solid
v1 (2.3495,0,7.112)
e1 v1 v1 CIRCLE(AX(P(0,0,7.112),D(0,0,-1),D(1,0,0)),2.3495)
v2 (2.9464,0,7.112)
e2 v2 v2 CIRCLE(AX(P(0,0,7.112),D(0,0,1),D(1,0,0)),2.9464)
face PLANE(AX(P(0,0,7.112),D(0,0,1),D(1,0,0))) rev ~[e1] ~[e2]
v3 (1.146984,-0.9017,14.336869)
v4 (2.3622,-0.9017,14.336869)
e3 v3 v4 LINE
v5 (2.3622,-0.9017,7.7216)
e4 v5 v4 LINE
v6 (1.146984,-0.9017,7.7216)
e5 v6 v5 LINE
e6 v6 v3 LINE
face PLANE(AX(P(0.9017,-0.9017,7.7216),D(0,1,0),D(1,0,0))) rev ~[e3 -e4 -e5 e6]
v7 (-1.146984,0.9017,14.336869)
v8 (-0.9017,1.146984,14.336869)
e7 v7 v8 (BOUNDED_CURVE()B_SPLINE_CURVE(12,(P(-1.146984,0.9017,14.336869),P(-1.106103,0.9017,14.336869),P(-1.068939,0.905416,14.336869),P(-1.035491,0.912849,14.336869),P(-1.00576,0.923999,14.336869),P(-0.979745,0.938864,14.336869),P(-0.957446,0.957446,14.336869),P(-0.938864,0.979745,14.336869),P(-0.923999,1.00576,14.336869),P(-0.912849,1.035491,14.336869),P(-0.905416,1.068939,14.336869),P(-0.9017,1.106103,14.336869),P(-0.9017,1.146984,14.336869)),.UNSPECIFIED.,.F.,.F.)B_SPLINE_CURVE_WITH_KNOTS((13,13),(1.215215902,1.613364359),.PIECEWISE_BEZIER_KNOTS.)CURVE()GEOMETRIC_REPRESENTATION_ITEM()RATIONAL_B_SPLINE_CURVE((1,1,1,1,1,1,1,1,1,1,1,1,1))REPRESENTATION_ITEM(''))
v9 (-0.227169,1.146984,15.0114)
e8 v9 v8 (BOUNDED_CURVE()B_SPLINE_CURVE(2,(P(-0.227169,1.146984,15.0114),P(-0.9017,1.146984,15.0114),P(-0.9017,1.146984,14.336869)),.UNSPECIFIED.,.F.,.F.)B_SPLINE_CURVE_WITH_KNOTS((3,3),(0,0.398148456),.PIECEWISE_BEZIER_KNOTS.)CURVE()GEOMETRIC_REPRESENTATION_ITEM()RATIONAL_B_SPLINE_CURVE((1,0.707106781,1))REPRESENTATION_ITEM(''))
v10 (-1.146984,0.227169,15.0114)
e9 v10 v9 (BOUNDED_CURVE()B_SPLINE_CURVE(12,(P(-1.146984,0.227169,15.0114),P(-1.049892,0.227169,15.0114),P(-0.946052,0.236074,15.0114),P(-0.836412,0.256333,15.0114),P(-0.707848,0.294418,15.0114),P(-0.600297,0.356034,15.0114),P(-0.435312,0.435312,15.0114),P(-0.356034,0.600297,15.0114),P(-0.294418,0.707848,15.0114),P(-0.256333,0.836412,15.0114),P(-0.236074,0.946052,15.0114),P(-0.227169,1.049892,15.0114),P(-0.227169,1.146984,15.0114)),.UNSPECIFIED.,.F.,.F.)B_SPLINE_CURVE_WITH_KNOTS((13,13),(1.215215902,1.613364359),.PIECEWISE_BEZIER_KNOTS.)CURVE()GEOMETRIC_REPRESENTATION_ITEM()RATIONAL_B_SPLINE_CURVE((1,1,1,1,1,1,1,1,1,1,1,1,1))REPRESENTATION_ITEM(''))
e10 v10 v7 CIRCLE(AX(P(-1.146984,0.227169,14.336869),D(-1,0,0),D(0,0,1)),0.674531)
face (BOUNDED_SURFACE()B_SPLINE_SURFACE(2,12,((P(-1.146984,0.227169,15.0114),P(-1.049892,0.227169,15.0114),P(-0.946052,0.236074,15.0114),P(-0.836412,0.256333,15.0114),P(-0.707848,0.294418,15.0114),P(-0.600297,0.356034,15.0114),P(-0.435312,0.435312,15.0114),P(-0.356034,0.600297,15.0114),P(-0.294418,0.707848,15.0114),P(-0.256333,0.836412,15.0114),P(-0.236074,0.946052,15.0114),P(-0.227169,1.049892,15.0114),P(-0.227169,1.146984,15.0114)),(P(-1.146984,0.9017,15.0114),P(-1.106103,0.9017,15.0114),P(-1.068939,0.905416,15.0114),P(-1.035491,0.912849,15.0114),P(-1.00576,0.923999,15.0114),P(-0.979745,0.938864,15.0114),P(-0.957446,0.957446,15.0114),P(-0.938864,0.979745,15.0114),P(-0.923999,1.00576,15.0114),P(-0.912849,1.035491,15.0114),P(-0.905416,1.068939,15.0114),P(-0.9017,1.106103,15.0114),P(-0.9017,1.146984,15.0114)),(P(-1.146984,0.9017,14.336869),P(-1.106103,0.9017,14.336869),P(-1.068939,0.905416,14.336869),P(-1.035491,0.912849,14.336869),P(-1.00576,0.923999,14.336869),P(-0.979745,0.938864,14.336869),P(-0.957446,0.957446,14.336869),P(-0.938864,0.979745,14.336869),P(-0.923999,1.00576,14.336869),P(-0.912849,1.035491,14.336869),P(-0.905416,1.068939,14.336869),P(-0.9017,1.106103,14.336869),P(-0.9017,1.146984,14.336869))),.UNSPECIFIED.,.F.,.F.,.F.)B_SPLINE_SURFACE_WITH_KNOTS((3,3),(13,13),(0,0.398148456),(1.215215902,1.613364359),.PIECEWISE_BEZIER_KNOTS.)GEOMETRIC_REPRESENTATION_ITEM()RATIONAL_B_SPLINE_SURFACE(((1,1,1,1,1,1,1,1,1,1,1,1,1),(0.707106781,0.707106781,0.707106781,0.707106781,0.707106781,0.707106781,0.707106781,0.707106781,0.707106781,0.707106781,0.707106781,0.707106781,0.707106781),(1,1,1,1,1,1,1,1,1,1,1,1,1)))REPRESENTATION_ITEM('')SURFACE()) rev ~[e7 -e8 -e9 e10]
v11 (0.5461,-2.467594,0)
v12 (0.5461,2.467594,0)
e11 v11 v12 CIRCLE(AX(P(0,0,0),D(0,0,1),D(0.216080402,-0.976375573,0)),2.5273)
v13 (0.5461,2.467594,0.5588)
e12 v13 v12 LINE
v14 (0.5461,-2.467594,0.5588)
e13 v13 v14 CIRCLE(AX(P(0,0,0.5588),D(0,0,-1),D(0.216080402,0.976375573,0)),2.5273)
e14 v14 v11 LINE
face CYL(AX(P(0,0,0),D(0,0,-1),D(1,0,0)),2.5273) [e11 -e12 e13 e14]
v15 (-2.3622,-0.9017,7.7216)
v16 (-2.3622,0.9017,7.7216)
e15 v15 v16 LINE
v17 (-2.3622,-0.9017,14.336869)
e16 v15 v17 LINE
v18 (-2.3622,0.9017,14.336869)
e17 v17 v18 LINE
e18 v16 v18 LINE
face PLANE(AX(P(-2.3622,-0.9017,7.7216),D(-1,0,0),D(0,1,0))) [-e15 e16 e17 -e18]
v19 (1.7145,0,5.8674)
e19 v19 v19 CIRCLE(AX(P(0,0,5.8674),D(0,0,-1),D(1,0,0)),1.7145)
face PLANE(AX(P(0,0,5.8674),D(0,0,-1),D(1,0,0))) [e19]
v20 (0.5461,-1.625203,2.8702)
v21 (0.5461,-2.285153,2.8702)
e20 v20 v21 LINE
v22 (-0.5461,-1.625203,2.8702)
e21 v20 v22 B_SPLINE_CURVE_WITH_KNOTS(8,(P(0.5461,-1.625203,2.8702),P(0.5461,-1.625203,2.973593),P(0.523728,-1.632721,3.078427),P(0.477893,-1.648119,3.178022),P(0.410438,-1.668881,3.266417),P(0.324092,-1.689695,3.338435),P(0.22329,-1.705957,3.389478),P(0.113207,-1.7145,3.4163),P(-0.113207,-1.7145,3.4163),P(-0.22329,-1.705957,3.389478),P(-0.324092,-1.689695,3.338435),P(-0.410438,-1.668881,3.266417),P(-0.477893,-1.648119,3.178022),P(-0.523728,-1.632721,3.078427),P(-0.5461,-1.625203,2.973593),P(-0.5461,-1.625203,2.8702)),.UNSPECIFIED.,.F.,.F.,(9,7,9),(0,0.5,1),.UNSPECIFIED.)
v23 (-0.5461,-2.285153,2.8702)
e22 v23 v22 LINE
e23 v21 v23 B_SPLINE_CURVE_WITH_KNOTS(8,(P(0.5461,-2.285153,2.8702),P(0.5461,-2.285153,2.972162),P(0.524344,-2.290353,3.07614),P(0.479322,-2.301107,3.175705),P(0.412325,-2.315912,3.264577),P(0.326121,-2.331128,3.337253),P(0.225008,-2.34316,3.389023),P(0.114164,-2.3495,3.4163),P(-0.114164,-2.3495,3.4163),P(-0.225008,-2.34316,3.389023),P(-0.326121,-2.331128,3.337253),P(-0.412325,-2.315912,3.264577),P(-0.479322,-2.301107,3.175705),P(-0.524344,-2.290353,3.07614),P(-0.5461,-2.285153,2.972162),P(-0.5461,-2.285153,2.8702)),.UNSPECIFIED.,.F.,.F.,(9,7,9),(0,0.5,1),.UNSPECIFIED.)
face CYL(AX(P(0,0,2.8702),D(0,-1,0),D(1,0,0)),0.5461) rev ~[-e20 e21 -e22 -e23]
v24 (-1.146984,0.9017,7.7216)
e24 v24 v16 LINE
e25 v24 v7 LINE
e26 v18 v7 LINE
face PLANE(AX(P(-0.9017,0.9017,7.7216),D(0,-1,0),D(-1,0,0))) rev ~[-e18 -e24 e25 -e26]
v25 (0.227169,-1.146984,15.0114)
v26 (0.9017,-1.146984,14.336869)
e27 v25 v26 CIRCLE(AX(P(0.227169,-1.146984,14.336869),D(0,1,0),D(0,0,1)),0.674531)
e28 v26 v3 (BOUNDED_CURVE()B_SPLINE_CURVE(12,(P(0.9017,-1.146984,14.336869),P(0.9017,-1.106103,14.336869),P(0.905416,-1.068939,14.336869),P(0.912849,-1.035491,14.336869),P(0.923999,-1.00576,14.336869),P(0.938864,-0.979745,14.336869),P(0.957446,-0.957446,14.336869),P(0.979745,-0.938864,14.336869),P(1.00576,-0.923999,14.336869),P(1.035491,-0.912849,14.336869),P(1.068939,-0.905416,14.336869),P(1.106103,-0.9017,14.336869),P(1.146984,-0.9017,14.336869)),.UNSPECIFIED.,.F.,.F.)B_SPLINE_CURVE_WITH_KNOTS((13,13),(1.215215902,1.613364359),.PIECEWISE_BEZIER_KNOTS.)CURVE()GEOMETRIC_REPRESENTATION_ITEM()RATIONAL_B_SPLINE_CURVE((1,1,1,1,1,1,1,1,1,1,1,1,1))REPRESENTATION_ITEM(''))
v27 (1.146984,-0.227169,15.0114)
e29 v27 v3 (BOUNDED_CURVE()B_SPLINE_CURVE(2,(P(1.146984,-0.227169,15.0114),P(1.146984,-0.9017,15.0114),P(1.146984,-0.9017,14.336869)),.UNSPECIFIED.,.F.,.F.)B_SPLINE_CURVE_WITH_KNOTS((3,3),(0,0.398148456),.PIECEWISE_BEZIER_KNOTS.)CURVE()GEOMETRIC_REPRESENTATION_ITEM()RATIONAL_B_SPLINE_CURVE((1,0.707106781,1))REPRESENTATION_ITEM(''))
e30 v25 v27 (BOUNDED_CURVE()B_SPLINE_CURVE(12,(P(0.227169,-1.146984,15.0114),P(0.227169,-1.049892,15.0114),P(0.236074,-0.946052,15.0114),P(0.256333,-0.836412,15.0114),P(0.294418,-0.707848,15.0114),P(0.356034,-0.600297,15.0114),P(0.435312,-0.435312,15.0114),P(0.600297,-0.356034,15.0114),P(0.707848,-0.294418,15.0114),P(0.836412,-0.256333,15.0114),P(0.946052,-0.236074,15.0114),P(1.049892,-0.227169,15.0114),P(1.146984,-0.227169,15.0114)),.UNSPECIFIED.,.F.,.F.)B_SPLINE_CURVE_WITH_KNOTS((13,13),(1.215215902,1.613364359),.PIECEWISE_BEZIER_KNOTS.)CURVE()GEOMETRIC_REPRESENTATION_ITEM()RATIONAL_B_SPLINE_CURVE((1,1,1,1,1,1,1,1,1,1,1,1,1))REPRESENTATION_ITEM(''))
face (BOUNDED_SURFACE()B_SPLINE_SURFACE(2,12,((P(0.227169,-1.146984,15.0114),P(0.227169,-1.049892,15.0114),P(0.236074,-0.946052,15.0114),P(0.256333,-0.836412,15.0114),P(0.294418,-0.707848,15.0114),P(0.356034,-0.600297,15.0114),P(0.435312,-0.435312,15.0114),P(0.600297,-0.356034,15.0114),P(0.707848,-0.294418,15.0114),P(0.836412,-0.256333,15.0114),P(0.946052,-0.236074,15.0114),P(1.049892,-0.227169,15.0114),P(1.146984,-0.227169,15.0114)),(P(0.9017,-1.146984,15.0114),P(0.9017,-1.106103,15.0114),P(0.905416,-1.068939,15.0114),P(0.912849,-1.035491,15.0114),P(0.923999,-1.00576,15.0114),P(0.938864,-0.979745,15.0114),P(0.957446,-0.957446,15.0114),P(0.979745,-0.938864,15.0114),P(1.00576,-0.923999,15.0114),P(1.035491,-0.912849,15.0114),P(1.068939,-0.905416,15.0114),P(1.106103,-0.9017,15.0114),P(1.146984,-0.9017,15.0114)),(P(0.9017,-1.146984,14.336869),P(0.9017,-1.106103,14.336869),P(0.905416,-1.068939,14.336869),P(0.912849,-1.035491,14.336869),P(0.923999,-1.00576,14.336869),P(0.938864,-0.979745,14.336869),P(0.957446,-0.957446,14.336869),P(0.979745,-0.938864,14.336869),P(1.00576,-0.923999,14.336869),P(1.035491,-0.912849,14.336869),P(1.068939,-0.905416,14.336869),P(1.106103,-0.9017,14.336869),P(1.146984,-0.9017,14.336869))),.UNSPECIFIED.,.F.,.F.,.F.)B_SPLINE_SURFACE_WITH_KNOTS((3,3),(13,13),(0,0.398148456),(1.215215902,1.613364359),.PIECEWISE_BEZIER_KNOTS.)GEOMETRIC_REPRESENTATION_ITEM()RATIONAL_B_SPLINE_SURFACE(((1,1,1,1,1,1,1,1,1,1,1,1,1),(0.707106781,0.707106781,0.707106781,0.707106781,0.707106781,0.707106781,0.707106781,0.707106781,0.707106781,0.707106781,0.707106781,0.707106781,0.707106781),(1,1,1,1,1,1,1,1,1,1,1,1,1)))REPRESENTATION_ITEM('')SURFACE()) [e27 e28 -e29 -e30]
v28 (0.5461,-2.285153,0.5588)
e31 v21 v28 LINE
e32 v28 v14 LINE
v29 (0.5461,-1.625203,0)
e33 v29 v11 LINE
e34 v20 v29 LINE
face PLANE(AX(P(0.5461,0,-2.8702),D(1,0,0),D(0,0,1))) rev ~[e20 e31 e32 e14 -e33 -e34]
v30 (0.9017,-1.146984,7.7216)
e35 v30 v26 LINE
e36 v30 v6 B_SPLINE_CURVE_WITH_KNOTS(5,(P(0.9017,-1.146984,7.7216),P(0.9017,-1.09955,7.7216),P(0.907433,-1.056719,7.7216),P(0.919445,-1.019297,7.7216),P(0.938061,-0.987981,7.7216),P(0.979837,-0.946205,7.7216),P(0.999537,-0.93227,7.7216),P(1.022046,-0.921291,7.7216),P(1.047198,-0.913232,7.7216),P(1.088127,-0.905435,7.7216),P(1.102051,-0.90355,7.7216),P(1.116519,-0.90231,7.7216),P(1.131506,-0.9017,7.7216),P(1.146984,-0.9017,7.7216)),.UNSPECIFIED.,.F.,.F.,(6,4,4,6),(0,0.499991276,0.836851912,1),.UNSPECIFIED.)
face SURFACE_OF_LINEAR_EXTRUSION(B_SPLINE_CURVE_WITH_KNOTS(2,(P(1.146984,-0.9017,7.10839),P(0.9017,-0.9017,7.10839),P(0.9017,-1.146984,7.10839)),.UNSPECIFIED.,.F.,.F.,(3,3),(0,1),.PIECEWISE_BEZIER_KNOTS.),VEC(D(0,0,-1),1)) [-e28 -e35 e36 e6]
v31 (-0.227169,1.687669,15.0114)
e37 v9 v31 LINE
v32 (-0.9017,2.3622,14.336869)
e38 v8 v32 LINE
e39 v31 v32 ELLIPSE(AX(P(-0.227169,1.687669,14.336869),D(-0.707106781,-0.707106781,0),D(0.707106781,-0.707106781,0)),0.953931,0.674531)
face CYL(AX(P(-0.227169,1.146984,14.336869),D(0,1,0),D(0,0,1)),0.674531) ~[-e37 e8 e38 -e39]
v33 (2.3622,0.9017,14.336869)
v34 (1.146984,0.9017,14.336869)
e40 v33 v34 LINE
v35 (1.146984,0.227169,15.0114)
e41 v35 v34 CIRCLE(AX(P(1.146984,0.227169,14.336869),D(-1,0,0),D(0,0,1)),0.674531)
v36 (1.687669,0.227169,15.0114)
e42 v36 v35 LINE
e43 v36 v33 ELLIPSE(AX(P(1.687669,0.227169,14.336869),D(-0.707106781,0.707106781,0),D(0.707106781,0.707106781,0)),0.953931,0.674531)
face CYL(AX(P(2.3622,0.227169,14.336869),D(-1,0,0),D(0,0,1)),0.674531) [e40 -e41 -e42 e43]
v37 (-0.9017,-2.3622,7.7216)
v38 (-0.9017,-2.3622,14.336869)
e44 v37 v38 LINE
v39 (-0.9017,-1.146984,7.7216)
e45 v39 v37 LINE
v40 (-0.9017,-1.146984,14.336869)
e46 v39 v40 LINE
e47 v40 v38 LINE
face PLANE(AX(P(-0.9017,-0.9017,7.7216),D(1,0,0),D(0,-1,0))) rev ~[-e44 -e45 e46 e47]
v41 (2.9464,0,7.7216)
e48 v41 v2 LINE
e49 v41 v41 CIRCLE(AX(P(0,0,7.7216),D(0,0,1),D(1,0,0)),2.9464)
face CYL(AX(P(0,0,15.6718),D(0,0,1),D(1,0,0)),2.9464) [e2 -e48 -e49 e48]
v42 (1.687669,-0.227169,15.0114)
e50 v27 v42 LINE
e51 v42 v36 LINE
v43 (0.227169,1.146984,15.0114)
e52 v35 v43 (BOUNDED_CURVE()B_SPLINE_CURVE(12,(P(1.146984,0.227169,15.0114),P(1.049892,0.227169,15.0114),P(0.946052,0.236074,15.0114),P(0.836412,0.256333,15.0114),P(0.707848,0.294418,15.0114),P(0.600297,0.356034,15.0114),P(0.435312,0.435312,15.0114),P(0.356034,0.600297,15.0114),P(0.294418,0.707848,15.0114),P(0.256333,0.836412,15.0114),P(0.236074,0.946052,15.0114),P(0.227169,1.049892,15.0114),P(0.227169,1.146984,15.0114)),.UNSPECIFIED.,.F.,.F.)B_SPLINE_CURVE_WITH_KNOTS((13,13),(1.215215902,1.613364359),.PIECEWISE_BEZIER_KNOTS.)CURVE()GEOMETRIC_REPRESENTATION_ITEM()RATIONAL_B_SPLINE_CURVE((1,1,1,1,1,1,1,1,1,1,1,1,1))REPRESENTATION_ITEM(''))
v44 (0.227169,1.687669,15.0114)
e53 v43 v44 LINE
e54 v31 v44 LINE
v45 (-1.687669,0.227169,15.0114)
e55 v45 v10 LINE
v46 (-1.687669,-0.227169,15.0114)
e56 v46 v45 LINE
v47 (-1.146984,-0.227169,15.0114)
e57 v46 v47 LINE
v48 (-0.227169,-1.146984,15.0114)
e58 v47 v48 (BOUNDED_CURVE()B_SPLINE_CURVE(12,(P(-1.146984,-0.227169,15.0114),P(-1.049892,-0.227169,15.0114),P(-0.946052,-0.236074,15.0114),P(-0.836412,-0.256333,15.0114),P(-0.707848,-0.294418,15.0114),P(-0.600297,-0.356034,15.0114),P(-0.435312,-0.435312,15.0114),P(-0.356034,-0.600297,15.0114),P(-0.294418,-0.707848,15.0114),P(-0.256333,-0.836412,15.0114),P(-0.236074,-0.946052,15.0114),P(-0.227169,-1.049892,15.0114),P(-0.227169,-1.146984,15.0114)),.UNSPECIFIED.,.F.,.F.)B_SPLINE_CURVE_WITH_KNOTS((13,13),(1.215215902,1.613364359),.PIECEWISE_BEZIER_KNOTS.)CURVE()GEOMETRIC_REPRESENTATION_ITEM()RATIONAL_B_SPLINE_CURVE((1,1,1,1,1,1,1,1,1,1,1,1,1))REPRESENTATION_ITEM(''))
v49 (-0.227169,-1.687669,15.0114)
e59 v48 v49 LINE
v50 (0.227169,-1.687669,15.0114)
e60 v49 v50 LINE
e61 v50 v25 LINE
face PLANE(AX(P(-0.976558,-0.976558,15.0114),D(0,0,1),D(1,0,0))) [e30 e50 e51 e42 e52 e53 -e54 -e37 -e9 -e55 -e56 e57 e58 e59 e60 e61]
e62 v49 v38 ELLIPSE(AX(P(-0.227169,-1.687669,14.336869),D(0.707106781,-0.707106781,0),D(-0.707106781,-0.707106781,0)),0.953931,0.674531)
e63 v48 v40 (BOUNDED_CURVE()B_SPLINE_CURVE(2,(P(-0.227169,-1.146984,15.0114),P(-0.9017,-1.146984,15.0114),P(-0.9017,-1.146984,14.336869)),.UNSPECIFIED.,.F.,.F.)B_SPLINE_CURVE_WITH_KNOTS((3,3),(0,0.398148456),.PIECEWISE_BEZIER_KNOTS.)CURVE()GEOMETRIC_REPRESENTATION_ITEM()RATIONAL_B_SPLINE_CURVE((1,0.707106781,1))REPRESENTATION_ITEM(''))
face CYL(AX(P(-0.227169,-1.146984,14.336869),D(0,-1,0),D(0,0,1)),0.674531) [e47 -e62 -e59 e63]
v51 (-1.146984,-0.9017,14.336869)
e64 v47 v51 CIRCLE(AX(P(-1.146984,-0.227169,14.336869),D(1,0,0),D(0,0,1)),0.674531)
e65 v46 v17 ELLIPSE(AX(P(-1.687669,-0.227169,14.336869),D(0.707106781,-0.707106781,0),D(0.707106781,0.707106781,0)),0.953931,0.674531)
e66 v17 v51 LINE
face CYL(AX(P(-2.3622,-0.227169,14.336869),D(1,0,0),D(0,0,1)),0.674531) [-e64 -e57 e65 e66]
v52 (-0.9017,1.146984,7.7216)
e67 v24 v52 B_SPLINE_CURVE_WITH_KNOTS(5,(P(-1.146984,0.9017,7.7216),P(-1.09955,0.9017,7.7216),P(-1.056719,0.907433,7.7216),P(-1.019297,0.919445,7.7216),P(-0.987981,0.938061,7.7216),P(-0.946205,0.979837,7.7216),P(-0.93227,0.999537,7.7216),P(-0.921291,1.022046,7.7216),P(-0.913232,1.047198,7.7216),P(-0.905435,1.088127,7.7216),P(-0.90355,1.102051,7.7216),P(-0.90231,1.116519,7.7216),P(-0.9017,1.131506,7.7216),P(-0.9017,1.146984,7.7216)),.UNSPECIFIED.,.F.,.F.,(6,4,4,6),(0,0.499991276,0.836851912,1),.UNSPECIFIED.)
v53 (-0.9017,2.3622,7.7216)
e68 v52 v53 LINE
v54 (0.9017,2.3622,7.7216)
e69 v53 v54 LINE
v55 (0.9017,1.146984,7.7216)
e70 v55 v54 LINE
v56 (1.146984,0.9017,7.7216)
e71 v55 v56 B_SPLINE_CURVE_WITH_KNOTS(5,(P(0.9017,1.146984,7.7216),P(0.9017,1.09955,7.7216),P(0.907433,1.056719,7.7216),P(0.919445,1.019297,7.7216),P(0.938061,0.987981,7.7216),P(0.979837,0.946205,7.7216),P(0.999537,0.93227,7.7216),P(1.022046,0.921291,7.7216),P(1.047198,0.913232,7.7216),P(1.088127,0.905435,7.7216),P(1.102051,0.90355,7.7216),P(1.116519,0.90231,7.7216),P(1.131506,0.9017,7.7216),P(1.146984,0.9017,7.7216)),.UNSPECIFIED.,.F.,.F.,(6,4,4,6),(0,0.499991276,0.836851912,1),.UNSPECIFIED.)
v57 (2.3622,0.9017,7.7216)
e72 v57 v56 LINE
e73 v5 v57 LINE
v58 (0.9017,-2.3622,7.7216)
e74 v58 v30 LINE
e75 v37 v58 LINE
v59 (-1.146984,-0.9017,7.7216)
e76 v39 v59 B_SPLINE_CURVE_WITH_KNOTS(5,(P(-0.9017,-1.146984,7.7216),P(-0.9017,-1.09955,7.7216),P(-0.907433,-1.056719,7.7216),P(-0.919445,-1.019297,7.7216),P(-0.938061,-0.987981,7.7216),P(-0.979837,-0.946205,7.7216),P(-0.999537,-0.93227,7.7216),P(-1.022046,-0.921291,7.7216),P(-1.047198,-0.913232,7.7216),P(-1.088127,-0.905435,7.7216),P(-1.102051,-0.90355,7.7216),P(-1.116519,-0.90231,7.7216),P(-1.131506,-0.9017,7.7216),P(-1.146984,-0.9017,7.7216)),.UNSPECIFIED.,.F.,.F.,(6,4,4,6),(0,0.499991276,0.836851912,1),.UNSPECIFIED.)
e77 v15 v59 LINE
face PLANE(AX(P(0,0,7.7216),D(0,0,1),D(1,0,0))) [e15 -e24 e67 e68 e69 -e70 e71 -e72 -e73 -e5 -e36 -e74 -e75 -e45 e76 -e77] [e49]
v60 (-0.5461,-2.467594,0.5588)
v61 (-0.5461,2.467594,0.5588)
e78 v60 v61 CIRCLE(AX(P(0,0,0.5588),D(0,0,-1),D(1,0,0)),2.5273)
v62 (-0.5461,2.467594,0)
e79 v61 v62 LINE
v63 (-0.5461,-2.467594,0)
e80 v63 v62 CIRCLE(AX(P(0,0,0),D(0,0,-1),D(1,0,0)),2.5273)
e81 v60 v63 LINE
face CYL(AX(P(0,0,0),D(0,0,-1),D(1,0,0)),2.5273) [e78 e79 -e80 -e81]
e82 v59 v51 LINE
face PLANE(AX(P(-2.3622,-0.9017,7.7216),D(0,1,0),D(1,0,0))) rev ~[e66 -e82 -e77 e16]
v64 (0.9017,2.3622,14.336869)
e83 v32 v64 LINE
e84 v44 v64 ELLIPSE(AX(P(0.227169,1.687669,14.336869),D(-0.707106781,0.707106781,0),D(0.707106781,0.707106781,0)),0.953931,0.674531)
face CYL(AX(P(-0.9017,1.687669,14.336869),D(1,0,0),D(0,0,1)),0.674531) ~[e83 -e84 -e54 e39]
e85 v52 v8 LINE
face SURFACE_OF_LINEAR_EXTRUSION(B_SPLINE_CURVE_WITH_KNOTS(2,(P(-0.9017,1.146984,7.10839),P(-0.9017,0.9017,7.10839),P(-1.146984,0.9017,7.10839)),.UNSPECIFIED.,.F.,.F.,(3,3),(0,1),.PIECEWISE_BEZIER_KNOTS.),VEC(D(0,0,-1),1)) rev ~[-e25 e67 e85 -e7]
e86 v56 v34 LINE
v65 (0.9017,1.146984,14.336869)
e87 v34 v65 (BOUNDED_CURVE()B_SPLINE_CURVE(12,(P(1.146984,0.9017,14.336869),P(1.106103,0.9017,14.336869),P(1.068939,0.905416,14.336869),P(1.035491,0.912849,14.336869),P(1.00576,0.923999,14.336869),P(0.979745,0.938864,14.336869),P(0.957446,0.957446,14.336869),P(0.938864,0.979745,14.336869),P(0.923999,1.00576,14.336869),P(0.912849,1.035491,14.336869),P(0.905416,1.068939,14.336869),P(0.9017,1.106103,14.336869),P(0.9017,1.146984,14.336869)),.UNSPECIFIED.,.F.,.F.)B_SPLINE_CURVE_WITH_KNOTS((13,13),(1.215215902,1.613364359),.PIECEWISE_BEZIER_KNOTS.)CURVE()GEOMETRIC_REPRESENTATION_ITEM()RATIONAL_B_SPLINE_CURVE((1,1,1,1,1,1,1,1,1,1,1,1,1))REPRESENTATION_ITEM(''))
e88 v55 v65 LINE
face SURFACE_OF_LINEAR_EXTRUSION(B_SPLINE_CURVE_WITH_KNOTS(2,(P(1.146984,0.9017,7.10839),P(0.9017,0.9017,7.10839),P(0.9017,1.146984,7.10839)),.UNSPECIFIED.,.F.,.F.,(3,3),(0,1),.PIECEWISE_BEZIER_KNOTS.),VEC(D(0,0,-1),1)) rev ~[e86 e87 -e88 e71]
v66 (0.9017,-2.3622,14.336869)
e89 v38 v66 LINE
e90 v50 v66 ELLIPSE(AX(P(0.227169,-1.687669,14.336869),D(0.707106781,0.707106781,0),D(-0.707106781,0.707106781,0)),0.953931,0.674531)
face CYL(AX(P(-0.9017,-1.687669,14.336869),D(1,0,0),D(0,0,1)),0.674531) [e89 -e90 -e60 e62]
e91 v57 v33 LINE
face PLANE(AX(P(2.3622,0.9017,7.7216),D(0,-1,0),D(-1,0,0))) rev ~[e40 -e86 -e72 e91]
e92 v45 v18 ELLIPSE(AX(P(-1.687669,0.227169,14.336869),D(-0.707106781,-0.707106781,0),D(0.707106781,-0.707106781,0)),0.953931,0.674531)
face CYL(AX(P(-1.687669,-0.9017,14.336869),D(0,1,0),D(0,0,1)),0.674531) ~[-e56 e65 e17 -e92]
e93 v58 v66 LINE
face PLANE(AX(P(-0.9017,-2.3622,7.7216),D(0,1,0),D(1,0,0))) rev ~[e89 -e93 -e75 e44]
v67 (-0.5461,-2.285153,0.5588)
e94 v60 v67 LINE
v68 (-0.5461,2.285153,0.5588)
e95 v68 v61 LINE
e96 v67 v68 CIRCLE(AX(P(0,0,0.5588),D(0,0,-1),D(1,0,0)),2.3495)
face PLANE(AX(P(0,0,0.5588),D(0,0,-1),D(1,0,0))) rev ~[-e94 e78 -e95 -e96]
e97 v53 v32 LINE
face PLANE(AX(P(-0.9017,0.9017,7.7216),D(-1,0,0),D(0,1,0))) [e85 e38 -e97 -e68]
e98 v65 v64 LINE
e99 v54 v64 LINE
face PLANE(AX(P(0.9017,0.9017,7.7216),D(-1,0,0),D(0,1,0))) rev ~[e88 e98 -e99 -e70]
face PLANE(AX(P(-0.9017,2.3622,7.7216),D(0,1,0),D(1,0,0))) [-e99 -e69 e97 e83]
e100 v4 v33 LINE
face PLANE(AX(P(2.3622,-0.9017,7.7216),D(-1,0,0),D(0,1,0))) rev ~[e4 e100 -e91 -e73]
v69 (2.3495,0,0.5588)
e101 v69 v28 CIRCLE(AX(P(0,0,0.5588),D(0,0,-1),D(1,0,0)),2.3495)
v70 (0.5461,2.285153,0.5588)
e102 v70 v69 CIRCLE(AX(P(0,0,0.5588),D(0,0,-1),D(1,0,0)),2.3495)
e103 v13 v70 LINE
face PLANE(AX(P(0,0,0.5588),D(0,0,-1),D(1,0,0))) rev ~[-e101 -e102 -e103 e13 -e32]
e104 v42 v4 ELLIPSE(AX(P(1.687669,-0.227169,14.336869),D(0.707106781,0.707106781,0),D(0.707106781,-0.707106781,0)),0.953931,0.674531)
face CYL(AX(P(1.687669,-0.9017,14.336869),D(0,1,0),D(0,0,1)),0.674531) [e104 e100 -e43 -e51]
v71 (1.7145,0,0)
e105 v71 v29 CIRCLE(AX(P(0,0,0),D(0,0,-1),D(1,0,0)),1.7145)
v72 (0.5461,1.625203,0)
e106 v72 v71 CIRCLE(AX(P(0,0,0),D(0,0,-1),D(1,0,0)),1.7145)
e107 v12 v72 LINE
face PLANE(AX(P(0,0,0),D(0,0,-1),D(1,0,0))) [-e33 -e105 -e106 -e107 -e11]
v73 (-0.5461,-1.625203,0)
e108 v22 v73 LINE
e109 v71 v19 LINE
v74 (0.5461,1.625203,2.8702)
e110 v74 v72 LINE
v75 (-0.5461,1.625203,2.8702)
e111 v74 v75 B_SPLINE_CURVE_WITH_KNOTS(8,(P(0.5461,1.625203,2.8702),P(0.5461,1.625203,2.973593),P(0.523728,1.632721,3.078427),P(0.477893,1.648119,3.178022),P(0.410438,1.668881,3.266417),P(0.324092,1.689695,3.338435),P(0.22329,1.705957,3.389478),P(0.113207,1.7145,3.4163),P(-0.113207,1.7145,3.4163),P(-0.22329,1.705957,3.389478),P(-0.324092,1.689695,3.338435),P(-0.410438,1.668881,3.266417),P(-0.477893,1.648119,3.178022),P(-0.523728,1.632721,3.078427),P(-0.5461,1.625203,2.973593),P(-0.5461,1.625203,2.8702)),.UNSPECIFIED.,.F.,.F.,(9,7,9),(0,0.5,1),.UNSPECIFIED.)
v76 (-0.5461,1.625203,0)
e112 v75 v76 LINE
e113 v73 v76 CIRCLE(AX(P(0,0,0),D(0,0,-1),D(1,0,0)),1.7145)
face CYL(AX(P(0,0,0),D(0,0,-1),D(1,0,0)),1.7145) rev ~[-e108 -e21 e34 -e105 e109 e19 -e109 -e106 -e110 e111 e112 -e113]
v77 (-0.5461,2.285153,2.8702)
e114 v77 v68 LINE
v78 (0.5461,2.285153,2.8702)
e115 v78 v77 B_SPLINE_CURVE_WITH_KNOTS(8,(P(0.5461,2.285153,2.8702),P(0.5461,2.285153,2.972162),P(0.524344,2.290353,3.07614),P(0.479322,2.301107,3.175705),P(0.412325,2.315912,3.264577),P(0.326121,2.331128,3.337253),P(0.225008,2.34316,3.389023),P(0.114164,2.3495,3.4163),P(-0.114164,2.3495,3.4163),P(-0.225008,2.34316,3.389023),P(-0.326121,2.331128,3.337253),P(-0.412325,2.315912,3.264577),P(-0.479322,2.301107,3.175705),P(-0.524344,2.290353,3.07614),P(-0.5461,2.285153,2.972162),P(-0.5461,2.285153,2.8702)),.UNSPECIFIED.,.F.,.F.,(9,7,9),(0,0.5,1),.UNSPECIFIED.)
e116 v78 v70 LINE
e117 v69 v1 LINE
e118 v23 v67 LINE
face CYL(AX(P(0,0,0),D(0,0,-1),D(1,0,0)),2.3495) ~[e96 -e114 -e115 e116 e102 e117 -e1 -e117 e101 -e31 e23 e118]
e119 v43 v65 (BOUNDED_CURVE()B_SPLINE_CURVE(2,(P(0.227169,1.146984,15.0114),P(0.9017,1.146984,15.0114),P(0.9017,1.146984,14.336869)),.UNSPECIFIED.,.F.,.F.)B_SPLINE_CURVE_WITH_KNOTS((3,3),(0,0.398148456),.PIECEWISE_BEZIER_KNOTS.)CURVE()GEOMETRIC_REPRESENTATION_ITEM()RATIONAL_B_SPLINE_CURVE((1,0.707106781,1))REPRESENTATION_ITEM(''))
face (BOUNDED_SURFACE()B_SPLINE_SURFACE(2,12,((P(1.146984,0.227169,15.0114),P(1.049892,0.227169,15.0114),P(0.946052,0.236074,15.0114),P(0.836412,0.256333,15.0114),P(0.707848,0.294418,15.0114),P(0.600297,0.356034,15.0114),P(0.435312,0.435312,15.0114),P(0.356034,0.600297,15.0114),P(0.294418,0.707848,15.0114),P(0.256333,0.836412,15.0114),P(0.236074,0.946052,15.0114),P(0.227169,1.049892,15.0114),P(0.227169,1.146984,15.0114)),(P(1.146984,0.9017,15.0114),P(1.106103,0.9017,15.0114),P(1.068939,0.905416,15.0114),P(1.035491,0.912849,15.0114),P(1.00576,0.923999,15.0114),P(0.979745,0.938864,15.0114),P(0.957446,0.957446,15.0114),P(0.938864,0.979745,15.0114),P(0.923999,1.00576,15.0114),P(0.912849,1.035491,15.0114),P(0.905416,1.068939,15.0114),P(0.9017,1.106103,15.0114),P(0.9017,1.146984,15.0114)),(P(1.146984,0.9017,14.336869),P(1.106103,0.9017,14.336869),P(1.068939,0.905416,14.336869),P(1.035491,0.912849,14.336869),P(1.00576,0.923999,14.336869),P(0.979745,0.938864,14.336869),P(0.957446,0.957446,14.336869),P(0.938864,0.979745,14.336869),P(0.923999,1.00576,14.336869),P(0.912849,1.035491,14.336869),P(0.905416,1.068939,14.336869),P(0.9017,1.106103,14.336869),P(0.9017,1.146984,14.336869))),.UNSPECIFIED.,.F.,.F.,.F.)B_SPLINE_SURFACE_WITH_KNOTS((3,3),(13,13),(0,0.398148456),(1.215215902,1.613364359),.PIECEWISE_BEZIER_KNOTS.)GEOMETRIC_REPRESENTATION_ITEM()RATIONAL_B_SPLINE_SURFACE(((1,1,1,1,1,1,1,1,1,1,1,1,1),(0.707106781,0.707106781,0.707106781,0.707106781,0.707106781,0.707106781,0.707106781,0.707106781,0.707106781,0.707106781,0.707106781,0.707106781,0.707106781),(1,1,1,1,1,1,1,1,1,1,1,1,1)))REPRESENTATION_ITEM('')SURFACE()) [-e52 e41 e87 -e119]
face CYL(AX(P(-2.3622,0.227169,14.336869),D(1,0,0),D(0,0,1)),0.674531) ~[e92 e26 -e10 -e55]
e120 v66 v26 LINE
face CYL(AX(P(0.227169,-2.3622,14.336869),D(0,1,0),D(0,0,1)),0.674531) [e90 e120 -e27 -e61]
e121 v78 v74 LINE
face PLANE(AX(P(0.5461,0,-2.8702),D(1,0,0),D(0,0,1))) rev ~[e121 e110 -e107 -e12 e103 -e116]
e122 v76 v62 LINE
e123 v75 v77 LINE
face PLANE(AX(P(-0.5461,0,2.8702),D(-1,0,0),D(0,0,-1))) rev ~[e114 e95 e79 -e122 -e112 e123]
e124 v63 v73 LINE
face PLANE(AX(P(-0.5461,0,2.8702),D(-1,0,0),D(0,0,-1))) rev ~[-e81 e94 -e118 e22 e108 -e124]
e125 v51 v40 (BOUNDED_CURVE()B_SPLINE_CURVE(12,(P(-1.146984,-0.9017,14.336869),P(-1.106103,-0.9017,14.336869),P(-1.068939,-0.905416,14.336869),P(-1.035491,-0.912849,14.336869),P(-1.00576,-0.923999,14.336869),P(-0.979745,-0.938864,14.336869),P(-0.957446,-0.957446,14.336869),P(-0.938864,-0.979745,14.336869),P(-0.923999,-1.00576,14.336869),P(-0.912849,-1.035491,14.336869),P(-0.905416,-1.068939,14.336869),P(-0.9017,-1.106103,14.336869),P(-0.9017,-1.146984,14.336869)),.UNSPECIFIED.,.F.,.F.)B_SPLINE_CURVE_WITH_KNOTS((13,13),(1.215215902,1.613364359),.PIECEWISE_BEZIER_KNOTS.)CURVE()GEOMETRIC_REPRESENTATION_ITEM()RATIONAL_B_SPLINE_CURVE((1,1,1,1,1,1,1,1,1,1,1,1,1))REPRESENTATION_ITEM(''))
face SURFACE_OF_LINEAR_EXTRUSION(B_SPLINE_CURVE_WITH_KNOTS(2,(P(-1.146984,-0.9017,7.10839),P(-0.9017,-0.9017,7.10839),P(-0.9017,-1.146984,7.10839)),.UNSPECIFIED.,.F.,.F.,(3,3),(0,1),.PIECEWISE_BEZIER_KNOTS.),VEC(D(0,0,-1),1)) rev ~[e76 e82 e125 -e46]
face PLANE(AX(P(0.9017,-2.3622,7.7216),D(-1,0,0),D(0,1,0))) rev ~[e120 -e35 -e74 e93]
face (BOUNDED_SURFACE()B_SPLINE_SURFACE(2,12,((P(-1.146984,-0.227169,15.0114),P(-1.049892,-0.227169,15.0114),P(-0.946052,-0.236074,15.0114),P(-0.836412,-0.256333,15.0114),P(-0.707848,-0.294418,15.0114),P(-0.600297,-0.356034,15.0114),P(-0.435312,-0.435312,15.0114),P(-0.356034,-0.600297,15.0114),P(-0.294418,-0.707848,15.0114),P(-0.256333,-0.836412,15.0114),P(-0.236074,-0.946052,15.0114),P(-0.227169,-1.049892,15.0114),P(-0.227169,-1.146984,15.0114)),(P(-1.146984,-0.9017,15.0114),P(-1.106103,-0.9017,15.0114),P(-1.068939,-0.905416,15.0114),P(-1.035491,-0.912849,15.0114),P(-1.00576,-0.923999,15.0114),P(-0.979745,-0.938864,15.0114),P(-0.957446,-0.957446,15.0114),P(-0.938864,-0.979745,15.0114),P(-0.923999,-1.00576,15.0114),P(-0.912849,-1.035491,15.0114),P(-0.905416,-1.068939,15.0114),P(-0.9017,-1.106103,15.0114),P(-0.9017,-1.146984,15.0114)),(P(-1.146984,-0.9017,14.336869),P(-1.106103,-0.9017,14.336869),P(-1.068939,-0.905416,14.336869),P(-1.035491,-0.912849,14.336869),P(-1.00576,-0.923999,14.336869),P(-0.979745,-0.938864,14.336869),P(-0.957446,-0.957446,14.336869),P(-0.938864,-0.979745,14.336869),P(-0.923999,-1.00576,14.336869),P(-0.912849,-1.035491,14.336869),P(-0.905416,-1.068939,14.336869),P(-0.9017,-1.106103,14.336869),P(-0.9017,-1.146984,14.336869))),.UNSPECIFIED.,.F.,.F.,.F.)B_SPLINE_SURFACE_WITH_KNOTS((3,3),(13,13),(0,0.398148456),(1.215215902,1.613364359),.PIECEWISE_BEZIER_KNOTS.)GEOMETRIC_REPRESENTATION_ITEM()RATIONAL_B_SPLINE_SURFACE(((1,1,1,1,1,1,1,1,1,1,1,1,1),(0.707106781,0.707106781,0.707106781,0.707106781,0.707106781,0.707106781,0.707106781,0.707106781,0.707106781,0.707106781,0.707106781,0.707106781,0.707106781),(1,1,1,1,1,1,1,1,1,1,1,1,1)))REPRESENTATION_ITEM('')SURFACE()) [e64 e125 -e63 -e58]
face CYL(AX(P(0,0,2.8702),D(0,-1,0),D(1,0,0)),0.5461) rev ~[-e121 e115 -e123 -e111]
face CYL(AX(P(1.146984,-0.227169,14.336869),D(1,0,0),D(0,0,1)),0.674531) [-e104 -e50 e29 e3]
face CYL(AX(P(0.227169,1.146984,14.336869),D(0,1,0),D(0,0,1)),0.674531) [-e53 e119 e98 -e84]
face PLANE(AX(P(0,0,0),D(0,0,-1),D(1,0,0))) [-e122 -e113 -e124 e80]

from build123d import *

# Parameters (mm, degrees)
F0_R         = 2.3495
F1_DEPTH     = 15.6718
F3_R         = 2.5273
F4_DEPTH     = 0.5588
F5_DEPTH     = 12.7
F6_R         = 2.9464
F7_DEPTH     = 8.5598
F8_R         = 12.7
F9_DEPTH     = 7.9502
F10_W        = 1.4605
F10_H        = 1.8034
F10_W_2      = 1.8034
F10_H_2      = 1.4605
F11_DEPTH    = 7.2898
F12_T1_DEPTH = 7.9030102448
F13_R        = 0.6745312693
F14_R        = 1.7145
F15_DEPTH    = 5.8674


# Not quite as in the source:
# - a fillet or chamfer that OpenCascade refuses, or shapes differently, is made with other operations: its cross-section is extruded or revolved along the edge and cut away or added


with BuildPart() as f1:
    # F0 (on Top) → F1 (new body)
    with BuildSketch(Plane.XY):
        Circle(F0_R)
    extrude(amount=F1_DEPTH)

    # F3 (on face) → F4 (join)
    with BuildSketch(Plane(origin=(0, 0, 0), x_dir=(1, 0, 0), z_dir=(0, 0, -1))):
        Circle(F3_R)
    extrude(amount=-F4_DEPTH)

    # F2 (on Front) → F5 (cut, symmetric)
    with BuildSketch(Plane.XZ):
        with BuildLine():
            Line((-0.5461, -2.8702), (0.5461, -2.8702))
            Line((0.5461, -2.8702), (0.5461, 2.8702))
            ThreePointArc((0.5461, 2.8702), (0, 2.3241), (-0.5461, 2.8702))
            Line((-0.5461, 2.8702), (-0.5461, -2.8702))
        make_face()
        with BuildLine():
            ThreePointArc((-0.5461, 2.8702), (0, 2.3241), (0.5461, 2.8702))
            Line((0.5461, 2.8702), (-0.5461, 2.8702))
        make_face()
        with BuildLine():
            Line((-0.5461, 2.8702), (0.5461, 2.8702))
            ThreePointArc((0.5461, 2.8702), (0, 3.4163), (-0.5461, 2.8702))
        make_face()
    extrude(amount=F5_DEPTH, both=True, mode=Mode.SUBTRACT)

    # F6 (on face) → F7 (join)
    with BuildSketch(Plane.XY.offset(15.6718)):
        Circle(F6_R)
    extrude(amount=-F7_DEPTH)

    # F8 (on face) → F9 (cut)
    with BuildSketch(Plane.XY.offset(15.6718)):
        Circle(F8_R)
    extrude(amount=-F9_DEPTH, mode=Mode.SUBTRACT)

    # F10 (on face) → F11 (join)
    with BuildSketch(Plane.XY.offset(7.7216)):
        with Locations((1.63195, 0)):
            Rectangle(F10_W, F10_H)
        with Locations((0, -1.63195)):
            Rectangle(F10_W_2, F10_H_2)
        Rectangle(F10_W_2, F10_H)
        with Locations((-1.63195, 0)):
            Rectangle(F10_W, F10_H)
        with Locations((0, 1.63195)):
            Rectangle(F10_W_2, F10_H_2)
    extrude(amount=F11_DEPTH)

    # F12: fillet of radius 0.2452840979 on 4 edges, made by hand

    # F12_s2 → F12_t1 (join)
    with BuildSketch(Plane.XY.offset(7.1083897552)):
        with BuildLine():
            add(Edge.make_bspline(
                [(-1.1469840979, -0.9017), (-0.9017, -0.9017), (-0.9017, -1.1469840979)],
                knots=[0, 0, 0, 1, 1, 1], degree=2, weights=[1, 1, 1]))
            Line((-0.9017, -1.1469840979), (-0.9017, -0.9017))
            Line((-0.9017, -0.9017), (-1.1469840979, -0.9017))
        make_face()
        with BuildLine():
            add(Edge.make_bspline(
                [(1.1469840979, 0.9017), (0.9017, 0.9017), (0.9017, 1.1469840979)],
                knots=[0, 0, 0, 1, 1, 1], degree=2, weights=[1, 1, 1]))
            Line((0.9017, 1.1469840979), (0.9017, 0.9017))
            Line((0.9017, 0.9017), (1.1469840979, 0.9017))
        make_face()
        with BuildLine():
            add(Edge.make_bspline(
                [(1.1469840979, -0.9017), (0.9017, -0.9017), (0.9017, -1.1469840979)],
                knots=[0, 0, 0, 1, 1, 1], degree=2, weights=[1, 1, 1]))
            Line((0.9017, -1.1469840979), (0.9017, -0.9017))
            Line((0.9017, -0.9017), (1.1469840979, -0.9017))
        make_face()
        with BuildLine():
            add(Edge.make_bspline(
                [(-0.9017, 1.1469840979), (-0.9017, 0.9017), (-1.1469840979, 0.9017)],
                knots=[0, 0, 0, 1, 1, 1], degree=2, weights=[1, 1, 1]))
            Line((-1.1469840979, 0.9017), (-0.9017, 0.9017))
            Line((-0.9017, 0.9017), (-0.9017, 1.1469840979))
        make_face()
    extrude(amount=F12_T1_DEPTH)

    # F13
    f13_edges = [f1.edges().sort_by_distance(p)[0] for p in [
        (1.754592, -0.9017, 15.0114),
        (2.3622, 0, 15.0114),
        (1.754592, 0.9017, 15.0114),
        (0.963022, 0.96302, 15.0114),
        (0.9017, 1.754592, 15.0114),
        (0, 2.3622, 15.0114),
        (-0.9017, 1.754592, 15.0114),
        (-0.96302, 0.963022, 15.0114),
        (-1.754592, 0.9017, 15.0114),
        (-2.3622, 0, 15.0114),
        (-1.754592, -0.9017, 15.0114),
        (-0.963022, -0.96302, 15.0114),
        (-0.9017, -1.754592, 15.0114),
        (0, -2.3622, 15.0114),
        (0.9017, -1.754592, 15.0114),
        (0.963022, -0.96302, 15.0114),
    ]]
    fillet(f13_edges, radius=F13_R)

    # F14 (on face) → F15 (cut)
    with BuildSketch(Plane(origin=(0, 0, 0), x_dir=(1, 0, 0), z_dir=(0, 0, -1))):
        Circle(F14_R)
    extrude(amount=-F15_DEPTH, mode=Mode.SUBTRACT)


solid = f1.part
